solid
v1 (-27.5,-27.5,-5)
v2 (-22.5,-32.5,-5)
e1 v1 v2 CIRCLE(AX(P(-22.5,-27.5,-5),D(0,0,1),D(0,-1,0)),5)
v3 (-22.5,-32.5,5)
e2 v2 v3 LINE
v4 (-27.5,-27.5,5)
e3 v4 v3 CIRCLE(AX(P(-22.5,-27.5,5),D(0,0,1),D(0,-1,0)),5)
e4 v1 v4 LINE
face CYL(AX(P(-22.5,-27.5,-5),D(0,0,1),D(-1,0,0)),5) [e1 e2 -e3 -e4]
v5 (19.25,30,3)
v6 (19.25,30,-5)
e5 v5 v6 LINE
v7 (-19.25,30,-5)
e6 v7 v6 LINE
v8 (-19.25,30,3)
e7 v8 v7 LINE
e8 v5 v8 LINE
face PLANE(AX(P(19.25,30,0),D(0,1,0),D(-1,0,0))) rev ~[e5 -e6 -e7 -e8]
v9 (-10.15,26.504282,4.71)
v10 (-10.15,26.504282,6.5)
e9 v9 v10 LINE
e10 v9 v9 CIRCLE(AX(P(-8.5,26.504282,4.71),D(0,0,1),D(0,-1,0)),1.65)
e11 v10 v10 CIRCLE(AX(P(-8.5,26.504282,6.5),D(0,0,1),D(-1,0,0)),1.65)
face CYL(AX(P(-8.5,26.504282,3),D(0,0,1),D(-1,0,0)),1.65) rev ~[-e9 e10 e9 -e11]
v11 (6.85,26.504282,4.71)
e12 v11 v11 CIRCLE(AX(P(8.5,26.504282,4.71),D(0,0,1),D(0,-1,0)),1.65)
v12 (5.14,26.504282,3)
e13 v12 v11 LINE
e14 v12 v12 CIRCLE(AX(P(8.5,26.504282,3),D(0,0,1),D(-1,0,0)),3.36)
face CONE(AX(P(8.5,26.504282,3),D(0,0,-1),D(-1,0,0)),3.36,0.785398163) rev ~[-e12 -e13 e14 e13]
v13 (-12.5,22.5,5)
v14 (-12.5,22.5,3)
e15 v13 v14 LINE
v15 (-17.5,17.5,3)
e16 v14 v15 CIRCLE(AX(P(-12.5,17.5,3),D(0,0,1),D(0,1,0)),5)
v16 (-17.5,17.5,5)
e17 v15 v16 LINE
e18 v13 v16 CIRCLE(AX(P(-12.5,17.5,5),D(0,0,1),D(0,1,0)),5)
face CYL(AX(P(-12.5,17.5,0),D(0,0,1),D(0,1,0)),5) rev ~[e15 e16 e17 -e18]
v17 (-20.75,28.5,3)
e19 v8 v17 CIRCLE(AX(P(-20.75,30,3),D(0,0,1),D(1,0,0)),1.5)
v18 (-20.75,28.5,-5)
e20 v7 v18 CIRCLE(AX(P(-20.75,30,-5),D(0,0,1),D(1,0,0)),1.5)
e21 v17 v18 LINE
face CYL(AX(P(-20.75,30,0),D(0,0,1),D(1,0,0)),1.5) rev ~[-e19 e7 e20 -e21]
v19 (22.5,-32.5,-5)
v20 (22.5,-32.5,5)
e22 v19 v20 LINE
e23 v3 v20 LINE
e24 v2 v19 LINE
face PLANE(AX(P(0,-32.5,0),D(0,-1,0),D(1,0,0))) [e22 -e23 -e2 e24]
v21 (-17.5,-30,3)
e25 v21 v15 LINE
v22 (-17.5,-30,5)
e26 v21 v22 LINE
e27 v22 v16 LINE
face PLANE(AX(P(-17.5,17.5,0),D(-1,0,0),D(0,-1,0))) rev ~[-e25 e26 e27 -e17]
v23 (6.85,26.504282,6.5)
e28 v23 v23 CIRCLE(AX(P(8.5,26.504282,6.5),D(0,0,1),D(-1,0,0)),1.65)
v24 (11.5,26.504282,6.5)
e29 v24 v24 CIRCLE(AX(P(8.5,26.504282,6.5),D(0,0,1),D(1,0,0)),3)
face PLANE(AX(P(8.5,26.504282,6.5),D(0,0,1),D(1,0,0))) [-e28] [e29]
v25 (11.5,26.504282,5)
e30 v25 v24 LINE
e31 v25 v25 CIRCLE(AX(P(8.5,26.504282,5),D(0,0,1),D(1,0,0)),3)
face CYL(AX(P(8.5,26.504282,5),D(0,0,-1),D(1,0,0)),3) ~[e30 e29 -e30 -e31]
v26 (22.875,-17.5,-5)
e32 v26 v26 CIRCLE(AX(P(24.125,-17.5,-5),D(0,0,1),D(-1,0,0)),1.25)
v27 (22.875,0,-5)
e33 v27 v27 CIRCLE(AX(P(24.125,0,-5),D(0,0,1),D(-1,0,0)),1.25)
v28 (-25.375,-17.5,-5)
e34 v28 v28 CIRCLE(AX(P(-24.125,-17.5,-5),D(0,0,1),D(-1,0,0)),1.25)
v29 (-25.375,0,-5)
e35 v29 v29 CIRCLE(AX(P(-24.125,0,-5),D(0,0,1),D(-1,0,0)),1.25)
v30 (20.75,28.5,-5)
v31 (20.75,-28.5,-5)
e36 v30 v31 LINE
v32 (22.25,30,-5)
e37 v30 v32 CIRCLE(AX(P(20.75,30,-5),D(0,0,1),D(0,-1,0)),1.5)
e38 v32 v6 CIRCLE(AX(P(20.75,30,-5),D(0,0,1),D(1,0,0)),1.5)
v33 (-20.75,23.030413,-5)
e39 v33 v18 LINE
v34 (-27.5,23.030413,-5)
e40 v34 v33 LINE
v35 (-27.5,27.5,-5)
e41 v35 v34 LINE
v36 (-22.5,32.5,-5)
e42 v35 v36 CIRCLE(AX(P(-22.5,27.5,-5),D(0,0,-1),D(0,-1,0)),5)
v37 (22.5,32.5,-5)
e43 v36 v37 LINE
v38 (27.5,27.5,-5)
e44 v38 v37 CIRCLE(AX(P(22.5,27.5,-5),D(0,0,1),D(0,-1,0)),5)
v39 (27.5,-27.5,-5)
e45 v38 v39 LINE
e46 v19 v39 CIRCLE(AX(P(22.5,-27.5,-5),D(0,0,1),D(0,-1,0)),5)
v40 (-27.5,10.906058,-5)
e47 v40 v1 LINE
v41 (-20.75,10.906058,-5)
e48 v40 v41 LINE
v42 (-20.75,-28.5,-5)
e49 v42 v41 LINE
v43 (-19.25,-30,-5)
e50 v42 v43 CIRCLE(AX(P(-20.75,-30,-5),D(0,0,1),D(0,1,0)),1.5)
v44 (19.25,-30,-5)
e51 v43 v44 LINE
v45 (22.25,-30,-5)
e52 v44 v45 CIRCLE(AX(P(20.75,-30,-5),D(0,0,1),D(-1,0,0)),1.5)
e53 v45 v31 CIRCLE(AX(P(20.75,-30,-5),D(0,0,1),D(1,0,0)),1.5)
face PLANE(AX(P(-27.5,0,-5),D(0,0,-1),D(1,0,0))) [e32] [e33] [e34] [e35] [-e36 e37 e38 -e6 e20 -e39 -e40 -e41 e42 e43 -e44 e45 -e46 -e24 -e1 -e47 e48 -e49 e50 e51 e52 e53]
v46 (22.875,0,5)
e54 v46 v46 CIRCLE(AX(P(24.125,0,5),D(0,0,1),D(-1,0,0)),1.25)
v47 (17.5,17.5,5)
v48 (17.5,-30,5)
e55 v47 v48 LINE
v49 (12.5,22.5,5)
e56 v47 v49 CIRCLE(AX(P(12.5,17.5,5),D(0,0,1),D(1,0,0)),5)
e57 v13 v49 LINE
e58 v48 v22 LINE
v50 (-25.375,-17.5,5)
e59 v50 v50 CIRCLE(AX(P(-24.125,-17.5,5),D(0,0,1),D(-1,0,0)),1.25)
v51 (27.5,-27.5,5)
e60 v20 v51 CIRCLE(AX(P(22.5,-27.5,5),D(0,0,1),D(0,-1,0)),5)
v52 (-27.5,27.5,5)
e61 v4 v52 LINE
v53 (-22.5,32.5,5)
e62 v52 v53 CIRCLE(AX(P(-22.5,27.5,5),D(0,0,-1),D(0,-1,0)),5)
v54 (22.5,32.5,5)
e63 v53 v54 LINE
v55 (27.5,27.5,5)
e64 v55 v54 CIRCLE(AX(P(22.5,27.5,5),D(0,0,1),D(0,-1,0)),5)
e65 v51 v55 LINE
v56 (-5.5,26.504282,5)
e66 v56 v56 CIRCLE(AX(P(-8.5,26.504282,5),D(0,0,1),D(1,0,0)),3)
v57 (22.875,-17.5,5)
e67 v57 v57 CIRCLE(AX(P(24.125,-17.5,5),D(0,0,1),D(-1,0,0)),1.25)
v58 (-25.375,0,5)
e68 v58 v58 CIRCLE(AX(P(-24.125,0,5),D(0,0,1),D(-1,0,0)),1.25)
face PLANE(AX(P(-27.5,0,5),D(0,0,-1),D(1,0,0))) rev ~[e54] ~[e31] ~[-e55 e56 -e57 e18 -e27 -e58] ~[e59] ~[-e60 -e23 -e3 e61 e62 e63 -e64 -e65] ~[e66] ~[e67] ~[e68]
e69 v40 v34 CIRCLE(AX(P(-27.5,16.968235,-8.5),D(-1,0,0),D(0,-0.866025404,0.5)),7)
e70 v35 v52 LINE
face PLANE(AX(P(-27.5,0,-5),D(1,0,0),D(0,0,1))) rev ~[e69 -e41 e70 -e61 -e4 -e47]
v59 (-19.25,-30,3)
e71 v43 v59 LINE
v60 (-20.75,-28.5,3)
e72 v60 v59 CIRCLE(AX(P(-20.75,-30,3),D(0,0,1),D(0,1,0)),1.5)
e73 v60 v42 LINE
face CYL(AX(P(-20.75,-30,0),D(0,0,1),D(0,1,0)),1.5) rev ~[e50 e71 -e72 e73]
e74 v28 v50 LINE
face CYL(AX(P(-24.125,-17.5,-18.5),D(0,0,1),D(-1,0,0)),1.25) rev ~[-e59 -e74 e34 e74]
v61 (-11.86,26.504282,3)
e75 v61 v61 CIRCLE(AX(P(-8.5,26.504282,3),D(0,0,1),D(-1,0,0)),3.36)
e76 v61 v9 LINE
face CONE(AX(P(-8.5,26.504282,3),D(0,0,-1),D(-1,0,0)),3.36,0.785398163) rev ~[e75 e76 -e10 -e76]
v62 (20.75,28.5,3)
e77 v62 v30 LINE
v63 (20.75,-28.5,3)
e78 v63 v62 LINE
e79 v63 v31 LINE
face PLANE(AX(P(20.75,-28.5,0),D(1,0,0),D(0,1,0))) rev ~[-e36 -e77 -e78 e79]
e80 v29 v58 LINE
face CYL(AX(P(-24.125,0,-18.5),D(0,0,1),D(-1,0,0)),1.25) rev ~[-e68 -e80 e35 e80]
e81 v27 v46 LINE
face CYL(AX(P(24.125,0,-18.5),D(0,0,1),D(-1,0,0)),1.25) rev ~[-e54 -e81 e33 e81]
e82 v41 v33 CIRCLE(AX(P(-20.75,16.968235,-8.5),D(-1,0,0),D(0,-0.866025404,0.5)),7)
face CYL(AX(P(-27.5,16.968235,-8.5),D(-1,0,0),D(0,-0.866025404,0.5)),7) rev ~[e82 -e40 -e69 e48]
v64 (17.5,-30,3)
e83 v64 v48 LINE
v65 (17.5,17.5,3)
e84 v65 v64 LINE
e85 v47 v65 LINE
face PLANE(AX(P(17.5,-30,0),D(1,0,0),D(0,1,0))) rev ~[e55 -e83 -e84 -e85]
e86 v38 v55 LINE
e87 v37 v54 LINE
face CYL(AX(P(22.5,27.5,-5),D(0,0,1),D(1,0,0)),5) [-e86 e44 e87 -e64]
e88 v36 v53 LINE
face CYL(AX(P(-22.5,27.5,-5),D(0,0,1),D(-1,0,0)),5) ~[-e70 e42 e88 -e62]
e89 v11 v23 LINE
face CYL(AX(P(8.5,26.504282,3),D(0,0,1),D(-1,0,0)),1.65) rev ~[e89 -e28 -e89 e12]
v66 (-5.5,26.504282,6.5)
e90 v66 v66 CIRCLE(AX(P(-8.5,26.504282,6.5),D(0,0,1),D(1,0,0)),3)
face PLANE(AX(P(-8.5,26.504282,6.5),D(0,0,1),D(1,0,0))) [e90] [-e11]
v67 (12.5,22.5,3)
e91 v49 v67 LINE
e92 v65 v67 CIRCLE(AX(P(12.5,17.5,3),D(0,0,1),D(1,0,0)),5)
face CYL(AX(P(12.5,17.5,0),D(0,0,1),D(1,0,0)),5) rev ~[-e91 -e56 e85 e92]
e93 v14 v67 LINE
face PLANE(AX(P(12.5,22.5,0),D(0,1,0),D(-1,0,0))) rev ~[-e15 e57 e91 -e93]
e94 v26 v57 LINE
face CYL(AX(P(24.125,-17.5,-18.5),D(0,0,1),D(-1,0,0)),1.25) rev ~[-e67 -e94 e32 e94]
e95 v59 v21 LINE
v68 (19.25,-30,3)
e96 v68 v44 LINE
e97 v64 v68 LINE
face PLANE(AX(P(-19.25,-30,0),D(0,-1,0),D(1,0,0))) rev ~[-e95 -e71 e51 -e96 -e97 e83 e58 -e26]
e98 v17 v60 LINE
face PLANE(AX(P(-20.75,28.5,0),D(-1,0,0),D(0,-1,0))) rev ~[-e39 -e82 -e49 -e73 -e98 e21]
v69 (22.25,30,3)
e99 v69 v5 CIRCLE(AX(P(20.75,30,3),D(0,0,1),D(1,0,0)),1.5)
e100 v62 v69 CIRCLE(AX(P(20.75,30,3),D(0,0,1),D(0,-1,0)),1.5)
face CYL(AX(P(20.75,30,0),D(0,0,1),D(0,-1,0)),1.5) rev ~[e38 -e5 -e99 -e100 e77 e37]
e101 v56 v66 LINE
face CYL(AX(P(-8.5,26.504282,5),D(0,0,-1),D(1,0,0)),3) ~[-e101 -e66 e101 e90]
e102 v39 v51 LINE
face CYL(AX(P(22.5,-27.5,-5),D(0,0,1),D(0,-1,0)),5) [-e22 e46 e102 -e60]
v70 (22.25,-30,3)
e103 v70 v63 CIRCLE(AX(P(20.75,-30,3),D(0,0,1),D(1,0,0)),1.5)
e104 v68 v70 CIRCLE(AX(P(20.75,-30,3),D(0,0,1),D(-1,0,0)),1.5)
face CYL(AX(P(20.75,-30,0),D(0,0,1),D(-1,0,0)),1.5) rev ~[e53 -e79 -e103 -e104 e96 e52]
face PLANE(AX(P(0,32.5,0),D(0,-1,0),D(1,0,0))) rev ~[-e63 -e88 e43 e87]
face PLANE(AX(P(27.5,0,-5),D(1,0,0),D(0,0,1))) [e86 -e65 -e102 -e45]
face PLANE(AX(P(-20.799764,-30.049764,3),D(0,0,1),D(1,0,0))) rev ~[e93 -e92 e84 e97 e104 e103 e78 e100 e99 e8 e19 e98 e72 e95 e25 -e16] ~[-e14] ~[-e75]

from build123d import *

# Parameters (mm, degrees)
F0_W            = 55
F0_H            = 10
F1_DEPTH        = 32.5
F3_R            = 5
F4_DEPTH        = 12.5
F6_DEPTH        = 30
F7_DEPTH        = 3
F9_D            = 3.3
F9_CSINK_D      = 6.72
F9_CSINK_ANGLE  = 90
F10_R           = 3
F11_DEPTH       = 1.5
F12_D           = 3.3
F12_DEPTH       = 13.5
F12_CSINK_D     = 6.72
F12_CSINK_ANGLE = 90
F12_TIP         = 0.9914200214
F14_D           = 2.5
F14_DEPTH       = 13.5
F14_TIP         = 0.7510757738
F16_DEPTH       = 12


# Not quite as in the source:
# - a feature names something its author has since deleted; it is built from what else it names


with BuildPart() as f1:
    # F0 (on Front) → F1 (new body, symmetric)
    with BuildSketch(Plane.XZ):
        Rectangle(F0_W, F0_H)
    extrude(amount=F1_DEPTH, both=True)

    # F3
    f3_edges = [f1.edges().sort_by_distance(p)[0] for p in [
        (27.5, -32.5, 0),
        (-27.5, -32.5, 0),
        (-27.5, 32.5, 0),
        (27.5, 32.5, 0),
    ]]
    fillet(f3_edges, radius=F3_R)

    # F2 (on Top) → F4 (cut, symmetric)
    with BuildSketch(Plane.XY):
        with BuildLine():
            ThreePointArc((-12.5, 22.5), (-16.0355339059, 21.0355339059), (-17.5, 17.5))
            Line((-17.5, 17.5), (-17.5, -30))
            Line((-17.5, -30), (17.5, -30))
            Line((17.5, -30), (17.5, 17.5))
            ThreePointArc((17.5, 17.5), (16.0355339059, 21.0355339059), (12.5, 22.5))
            Line((12.5, 22.5), (-12.5, 22.5))
        make_face()
    extrude(amount=F4_DEPTH, both=True, mode=Mode.SUBTRACT)

    # F5 (on Top) → F6 (cut)
    with BuildSketch(Plane.XY):
        with BuildLine():
            ThreePointArc((-20.75, -28.5), (-21.8106601718, -31.0606601718), (-19.25, -30))
            Line((-19.25, -30), (-20.75, -30))
            Line((-20.75, -30), (-20.75, -28.5))
        make_face()
        with BuildLine():
            ThreePointArc((-20.75, -28.5), (-19.6893398282, -28.9393398282), (-19.25, -30))
            Line((-19.25, -30), (19.25, -30))
            ThreePointArc((19.25, -30), (19.6893398282, -28.9393398282), (20.75, -28.5))
            Line((20.75, -28.5), (20.75, 28.5))
            ThreePointArc((20.75, 28.5), (19.6893398282, 28.9393398282), (19.25, 30))
            Line((19.25, 30), (-19.25, 30))
            ThreePointArc((-19.25, 30), (-19.6893398282, 28.9393398282), (-20.75, 28.5))
            Line((-20.75, 28.5), (-20.75, -28.5))
        make_face()
        with BuildLine():
            Line((-20.75, -30), (-19.25, -30))
            ThreePointArc((-19.25, -30), (-19.6893398282, -28.9393398282), (-20.75, -28.5))
            Line((-20.75, -28.5), (-20.75, -30))
        make_face()
        with BuildLine():
            ThreePointArc((20.75, -28.5), (19.6893398282, -28.9393398282), (19.25, -30))
            Line((19.25, -30), (20.75, -30))
            Line((20.75, -30), (20.75, -28.5))
        make_face()
        with BuildLine():
            Line((20.75, -30), (19.25, -30))
            ThreePointArc((19.25, -30), (20.75, -31.5), (22.25, -30))
            ThreePointArc((22.25, -30), (21.8106601718, -28.9393398282), (20.75, -28.5))
            Line((20.75, -28.5), (20.75, -30))
        make_face()
        with BuildLine():
            ThreePointArc((-19.25, 30), (-21.8106601718, 31.0606601718), (-20.75, 28.5))
            Line((-20.75, 28.5), (-20.75, 30))
            Line((-20.75, 30), (-19.25, 30))
        make_face()
        with BuildLine():
            Line((-20.75, 30), (-20.75, 28.5))
            ThreePointArc((-20.75, 28.5), (-19.6893398282, 28.9393398282), (-19.25, 30))
            Line((-19.25, 30), (-20.75, 30))
        make_face()
        with BuildLine():
            ThreePointArc((19.25, 30), (19.6893398282, 28.9393398282), (20.75, 28.5))
            Line((20.75, 28.5), (20.75, 30))
            Line((20.75, 30), (19.25, 30))
        make_face()
        with BuildLine():
            Line((20.75, 30), (20.75, 28.5))
            ThreePointArc((20.75, 28.5), (21.8106601718, 28.9393398282), (22.25, 30))
            ThreePointArc((22.25, 30), (20.75, 31.5), (19.25, 30))
            Line((19.25, 30), (20.75, 30))
        make_face()
    extrude(amount=-F6_DEPTH, mode=Mode.SUBTRACT)

    # F5 (on Top) → F7 (cut)
    with BuildSketch(Plane.XY):
        with BuildLine():
            ThreePointArc((-20.75, -28.5), (-21.8106601718, -31.0606601718), (-19.25, -30))
            Line((-19.25, -30), (-20.75, -30))
            Line((-20.75, -30), (-20.75, -28.5))
        make_face()
        with BuildLine():
            ThreePointArc((-20.75, -28.5), (-19.6893398282, -28.9393398282), (-19.25, -30))
            Line((-19.25, -30), (19.25, -30))
            ThreePointArc((19.25, -30), (19.6893398282, -28.9393398282), (20.75, -28.5))
            Line((20.75, -28.5), (20.75, 28.5))
            ThreePointArc((20.75, 28.5), (19.6893398282, 28.9393398282), (19.25, 30))
            Line((19.25, 30), (-19.25, 30))
            ThreePointArc((-19.25, 30), (-19.6893398282, 28.9393398282), (-20.75, 28.5))
            Line((-20.75, 28.5), (-20.75, -28.5))
        make_face()
        with BuildLine():
            Line((-20.75, -30), (-19.25, -30))
            ThreePointArc((-19.25, -30), (-19.6893398282, -28.9393398282), (-20.75, -28.5))
            Line((-20.75, -28.5), (-20.75, -30))
        make_face()
        with BuildLine():
            ThreePointArc((20.75, -28.5), (19.6893398282, -28.9393398282), (19.25, -30))
            Line((19.25, -30), (20.75, -30))
            Line((20.75, -30), (20.75, -28.5))
        make_face()
        with BuildLine():
            Line((20.75, -30), (19.25, -30))
            ThreePointArc((19.25, -30), (20.75, -31.5), (22.25, -30))
            ThreePointArc((22.25, -30), (21.8106601718, -28.9393398282), (20.75, -28.5))
            Line((20.75, -28.5), (20.75, -30))
        make_face()
        with BuildLine():
            ThreePointArc((-19.25, 30), (-21.8106601718, 31.0606601718), (-20.75, 28.5))
            Line((-20.75, 28.5), (-20.75, 30))
            Line((-20.75, 30), (-19.25, 30))
        make_face()
        with BuildLine():
            Line((-20.75, 30), (-20.75, 28.5))
            ThreePointArc((-20.75, 28.5), (-19.6893398282, 28.9393398282), (-19.25, 30))
            Line((-19.25, 30), (-20.75, 30))
        make_face()
        with BuildLine():
            ThreePointArc((19.25, 30), (19.6893398282, 28.9393398282), (20.75, 28.5))
            Line((20.75, 28.5), (20.75, 30))
            Line((20.75, 30), (19.25, 30))
        make_face()
        with BuildLine():
            Line((20.75, 30), (20.75, 28.5))
            ThreePointArc((20.75, 28.5), (21.8106601718, 28.9393398282), (22.25, 30))
            ThreePointArc((22.25, 30), (20.75, 31.5), (19.25, 30))
            Line((19.25, 30), (20.75, 30))
        make_face()
    extrude(amount=F7_DEPTH, mode=Mode.SUBTRACT)

    # F9 (through all)
    with Locations(Plane(origin=(0, 0, 3), x_dir=(1, 0, 0), z_dir=(0, 0, -1))):
        with Locations((-8.5, -26.5042820722), (8.5, -26.5042820722)):
            CounterSinkHole(F9_D / 2, F9_CSINK_D / 2, counter_sink_angle=F9_CSINK_ANGLE)

    # F10 (on face) → F11 (join)
    with BuildSketch(Plane.XY.offset(5)):
        with Locations((8.5, 26.5042820722)):
            Circle(F10_R)
        with Locations((-8.5, 26.5042820722)):
            Circle(F10_R)
    extrude(amount=F11_DEPTH)

    # F12
    with Locations(Plane(origin=(0, 0, 3), x_dir=(1, 0, 0), z_dir=(0, 0, -1))):
        with Locations((-8.5, -26.5042820722), (8.5, -26.5042820722)):
            CounterSinkHole(F12_D / 2, F12_CSINK_D / 2, depth=F12_DEPTH, counter_sink_angle=F12_CSINK_ANGLE)
            with Locations((0, 0, -(F12_DEPTH + F12_TIP / 2))):  # 118° drill point
                Cone(0, F12_D / 2, F12_TIP, mode=Mode.SUBTRACT)

    # F14
    with Locations(Plane(origin=(0, 0, -5), x_dir=(1, 0, 0), z_dir=(0, 0, -1))):
        with Locations((-24.125, 0), (24.125, 0), (-24.125, 17.5), (24.125, 17.5)):
            Hole(F14_D / 2, depth=F14_DEPTH)
            with Locations((0, 0, -(F14_DEPTH + F14_TIP / 2))):  # 118° drill point
                Cone(0, F14_D / 2, F14_TIP, mode=Mode.SUBTRACT)

    # F15 (on face) → F16 (cut)
    with BuildSketch(Plane(origin=(-27.5, 0, 0), x_dir=(0, -1, 0), z_dir=(-1, 0, 0))):
        with BuildLine():
            Line((-23.0304132, -5), (-10.906057547, -5))
            ThreePointArc((-10.906057547, -5), (-16.9682353735, -1.5), (-23.0304132, -5))
        make_face()
    extrude(amount=-F16_DEPTH, mode=Mode.SUBTRACT)


solid = f1.part
